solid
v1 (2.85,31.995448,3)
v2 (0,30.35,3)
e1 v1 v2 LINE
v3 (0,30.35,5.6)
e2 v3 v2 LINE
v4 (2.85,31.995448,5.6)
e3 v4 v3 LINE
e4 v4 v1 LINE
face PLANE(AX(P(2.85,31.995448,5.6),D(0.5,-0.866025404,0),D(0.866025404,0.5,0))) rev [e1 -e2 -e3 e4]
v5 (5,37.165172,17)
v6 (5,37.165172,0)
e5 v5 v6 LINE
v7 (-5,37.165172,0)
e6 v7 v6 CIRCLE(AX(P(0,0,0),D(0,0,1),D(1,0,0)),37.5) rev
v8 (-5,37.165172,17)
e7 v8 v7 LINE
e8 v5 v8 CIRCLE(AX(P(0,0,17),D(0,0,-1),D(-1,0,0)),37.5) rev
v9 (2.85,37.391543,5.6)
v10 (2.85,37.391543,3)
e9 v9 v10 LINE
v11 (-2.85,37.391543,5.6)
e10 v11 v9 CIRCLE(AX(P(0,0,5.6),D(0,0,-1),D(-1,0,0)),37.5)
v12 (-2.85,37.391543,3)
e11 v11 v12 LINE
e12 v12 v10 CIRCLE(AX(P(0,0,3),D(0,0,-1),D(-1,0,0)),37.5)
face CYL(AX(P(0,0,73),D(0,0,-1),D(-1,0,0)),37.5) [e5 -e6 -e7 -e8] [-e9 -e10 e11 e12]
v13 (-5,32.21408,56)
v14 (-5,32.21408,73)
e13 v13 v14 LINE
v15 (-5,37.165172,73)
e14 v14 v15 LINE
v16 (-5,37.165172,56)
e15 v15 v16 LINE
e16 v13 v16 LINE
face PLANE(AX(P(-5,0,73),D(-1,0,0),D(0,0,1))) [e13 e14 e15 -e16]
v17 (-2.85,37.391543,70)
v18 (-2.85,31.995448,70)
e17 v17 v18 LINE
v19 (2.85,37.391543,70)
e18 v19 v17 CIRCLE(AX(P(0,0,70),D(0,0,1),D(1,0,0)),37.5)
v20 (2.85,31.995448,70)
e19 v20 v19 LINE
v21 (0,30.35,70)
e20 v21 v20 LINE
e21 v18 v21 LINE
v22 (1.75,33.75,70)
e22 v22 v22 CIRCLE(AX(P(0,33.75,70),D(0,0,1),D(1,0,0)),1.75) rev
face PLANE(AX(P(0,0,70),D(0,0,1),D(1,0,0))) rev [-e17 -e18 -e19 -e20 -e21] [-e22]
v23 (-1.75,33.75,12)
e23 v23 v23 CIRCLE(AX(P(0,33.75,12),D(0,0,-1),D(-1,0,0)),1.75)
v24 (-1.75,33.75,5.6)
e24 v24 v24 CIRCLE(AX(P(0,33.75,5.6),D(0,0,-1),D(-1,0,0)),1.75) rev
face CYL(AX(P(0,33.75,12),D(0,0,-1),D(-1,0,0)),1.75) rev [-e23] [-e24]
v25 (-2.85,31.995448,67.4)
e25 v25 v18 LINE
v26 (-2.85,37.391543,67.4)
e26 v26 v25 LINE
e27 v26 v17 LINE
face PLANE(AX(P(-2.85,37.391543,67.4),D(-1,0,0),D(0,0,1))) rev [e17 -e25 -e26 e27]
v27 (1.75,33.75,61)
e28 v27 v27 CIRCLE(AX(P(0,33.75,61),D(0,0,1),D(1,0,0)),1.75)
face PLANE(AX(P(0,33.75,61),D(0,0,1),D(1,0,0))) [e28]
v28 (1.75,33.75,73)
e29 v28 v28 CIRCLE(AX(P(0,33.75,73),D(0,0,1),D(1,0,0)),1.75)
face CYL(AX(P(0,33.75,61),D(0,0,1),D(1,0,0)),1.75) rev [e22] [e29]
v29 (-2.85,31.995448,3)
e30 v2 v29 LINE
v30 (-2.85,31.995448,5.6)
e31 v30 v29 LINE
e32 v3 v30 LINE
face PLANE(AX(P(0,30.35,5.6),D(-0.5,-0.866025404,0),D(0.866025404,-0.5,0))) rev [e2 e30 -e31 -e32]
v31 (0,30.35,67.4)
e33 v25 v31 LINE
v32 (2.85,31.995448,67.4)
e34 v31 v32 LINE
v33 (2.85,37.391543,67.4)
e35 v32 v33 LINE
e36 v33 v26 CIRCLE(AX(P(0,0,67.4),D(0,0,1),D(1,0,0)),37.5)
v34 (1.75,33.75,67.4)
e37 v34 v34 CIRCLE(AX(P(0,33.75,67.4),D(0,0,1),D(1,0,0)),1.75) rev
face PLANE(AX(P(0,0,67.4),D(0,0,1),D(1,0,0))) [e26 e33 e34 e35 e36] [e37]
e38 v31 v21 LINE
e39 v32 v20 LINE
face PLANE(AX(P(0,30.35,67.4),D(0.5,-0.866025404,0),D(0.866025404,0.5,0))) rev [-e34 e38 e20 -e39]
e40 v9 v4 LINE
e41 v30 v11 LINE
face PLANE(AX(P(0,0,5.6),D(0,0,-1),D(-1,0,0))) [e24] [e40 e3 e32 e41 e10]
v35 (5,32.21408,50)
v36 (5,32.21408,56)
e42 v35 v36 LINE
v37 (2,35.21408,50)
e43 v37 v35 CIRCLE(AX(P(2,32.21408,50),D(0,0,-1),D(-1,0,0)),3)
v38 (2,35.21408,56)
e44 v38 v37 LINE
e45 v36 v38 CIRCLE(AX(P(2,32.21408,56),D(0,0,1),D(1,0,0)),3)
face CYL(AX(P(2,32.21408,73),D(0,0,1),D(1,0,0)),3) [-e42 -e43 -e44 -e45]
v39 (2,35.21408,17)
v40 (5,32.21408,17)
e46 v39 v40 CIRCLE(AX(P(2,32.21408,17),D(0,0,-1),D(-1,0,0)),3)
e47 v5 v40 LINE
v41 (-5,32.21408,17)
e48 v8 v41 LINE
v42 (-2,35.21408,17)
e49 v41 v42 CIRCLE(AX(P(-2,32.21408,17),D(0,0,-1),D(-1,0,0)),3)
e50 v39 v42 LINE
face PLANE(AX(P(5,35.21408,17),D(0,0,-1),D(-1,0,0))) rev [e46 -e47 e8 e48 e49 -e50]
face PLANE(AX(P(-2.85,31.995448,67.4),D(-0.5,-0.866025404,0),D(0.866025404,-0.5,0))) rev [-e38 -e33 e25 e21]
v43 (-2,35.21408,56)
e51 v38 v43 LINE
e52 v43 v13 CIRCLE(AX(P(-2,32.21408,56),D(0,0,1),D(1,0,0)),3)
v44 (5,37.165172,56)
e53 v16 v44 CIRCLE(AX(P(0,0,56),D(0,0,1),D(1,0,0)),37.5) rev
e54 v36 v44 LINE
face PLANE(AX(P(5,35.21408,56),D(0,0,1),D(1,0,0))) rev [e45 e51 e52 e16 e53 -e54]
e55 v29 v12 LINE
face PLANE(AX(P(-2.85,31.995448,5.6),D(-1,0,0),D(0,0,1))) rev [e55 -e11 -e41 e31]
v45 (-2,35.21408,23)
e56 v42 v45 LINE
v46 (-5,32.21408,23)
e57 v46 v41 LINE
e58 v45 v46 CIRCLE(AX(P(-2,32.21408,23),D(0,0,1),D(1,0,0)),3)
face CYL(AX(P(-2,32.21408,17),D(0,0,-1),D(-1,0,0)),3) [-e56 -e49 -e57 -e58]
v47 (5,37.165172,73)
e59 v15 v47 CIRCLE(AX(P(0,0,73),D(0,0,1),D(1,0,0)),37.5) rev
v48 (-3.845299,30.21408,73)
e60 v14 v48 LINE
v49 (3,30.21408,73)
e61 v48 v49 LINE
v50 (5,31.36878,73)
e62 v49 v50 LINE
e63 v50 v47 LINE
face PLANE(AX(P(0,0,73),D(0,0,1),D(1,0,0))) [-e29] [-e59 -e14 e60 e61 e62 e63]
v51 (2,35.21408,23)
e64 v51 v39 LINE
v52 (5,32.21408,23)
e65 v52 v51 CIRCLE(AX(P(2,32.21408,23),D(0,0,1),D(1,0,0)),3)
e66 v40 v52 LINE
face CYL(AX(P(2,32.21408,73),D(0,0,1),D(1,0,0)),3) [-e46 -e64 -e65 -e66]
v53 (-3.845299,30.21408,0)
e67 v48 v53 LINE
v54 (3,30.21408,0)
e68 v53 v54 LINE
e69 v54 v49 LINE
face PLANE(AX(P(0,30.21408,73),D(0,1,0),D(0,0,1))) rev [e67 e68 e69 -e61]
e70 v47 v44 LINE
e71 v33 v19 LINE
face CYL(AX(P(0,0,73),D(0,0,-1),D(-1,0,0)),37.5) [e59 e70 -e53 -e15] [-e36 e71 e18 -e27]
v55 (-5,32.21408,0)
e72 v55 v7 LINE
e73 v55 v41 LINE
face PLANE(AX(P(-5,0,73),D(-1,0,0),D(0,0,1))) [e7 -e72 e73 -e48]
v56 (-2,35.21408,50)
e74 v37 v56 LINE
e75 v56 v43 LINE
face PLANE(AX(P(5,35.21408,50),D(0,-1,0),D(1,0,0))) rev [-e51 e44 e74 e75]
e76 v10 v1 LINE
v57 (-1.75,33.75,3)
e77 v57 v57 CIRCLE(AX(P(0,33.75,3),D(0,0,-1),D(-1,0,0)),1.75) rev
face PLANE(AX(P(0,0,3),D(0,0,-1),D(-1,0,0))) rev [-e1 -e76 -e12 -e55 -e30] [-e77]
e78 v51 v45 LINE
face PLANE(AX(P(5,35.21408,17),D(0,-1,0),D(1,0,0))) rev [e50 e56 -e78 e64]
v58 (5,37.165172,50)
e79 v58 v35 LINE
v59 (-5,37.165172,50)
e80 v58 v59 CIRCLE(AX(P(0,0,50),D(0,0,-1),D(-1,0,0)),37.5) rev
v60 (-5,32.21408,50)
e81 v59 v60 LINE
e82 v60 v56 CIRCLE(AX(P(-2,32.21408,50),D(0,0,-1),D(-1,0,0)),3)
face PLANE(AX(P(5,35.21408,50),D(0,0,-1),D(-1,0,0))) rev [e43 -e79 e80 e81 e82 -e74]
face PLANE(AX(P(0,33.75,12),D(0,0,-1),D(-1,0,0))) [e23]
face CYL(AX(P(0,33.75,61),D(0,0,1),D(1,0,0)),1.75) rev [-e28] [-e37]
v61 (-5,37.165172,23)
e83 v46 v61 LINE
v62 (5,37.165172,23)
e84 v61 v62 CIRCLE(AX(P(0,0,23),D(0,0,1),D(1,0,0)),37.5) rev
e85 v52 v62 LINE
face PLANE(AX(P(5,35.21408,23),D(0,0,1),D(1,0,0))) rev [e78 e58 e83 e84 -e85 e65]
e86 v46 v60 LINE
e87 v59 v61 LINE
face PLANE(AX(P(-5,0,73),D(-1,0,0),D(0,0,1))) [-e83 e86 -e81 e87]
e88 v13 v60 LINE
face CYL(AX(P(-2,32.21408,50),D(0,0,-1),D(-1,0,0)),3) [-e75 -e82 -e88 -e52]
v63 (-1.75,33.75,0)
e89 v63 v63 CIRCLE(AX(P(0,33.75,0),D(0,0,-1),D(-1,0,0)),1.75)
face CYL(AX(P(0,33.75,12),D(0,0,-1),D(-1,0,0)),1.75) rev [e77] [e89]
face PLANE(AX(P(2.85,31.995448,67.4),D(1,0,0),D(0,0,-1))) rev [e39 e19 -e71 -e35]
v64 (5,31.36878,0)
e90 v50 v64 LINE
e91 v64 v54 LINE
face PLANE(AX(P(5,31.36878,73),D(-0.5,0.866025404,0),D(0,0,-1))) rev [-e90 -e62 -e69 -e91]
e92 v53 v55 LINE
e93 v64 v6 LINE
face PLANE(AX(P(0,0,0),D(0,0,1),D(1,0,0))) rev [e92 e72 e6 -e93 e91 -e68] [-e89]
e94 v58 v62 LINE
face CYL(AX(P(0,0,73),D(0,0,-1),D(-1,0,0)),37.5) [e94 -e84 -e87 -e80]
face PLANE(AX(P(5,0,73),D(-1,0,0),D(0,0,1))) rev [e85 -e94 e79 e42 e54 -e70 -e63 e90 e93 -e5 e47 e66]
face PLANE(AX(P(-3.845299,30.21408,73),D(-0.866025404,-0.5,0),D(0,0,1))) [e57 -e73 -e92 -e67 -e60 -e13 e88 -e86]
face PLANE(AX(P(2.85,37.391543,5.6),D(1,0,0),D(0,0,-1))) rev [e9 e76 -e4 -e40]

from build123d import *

# Parameters (mm, degrees)
BOSS_EXTRU_2_DEPTH      = 73
ESQUISSE6_W             = 6
ESQUISSE6_H             = 5
ENL_V_MAT_EXTRU_3_DEPTH = 83.675570757
ESQUISSE7_R             = 1.75
ENL_V_MAT_EXTRU_4_DEPTH = 12
ENL_V_START             = -12
ESQUISSE8_R             = 1.75
ENL_V_MAT_EXTRU_5_DEPTH = 12
CONG_1_R                = 3
ENL_V_START_2           = -3
ENL_V_MAT_EXTRU_6_DEPTH = 2.6
ENL_V_START_3           = -5.6
ENL_V_MAT_EXTRU_7_DEPTH = 2.6
CHANFREIN1_SIZE         = 1.154700538
CHANFREIN1_SIZE_2       = 2


with BuildPart() as part:
    # Esquisse3 → Boss.-Extru.2 (new body)
    with BuildSketch(Plane.XY):
        with BuildLine():
            ThreePointArc((-5, 37.165171868), (0, 37.5), (5, 37.165171868))
            Line((5, 37.165171868), (5, 30.214079913))
            Line((5, 30.214079913), (-5, 30.214079913))
            Line((-5, 30.214079913), (-5, 37.165171868))
        make_face()
    extrude(amount=BOSS_EXTRU_2_DEPTH)

    # Esquisse6 → Enlèv. mat.-Extru.3 (cut, through all)
    with BuildSketch(Plane.ZY.offset(5)):
        with Locations((20, 37.714079913)):
            Rectangle(ESQUISSE6_W, ESQUISSE6_H)
        with Locations((53, 37.714079913)):
            Rectangle(ESQUISSE6_W, ESQUISSE6_H)
    extrude(amount=-ENL_V_MAT_EXTRU_3_DEPTH, mode=Mode.SUBTRACT)

    # Esquisse7 → Enlèv. mat.-Extru.4 (cut)
    with BuildSketch(Plane.XY.offset(73)):
        with Locations((0, 33.75)):
            Circle(ESQUISSE7_R)
    extrude(amount=-ENL_V_MAT_EXTRU_4_DEPTH, mode=Mode.SUBTRACT)

    # Esquisse8 → Enlèv. mat.-Extru.5 (cut)
    with BuildSketch(Plane(origin=(0, 0, 0), x_dir=(-1, 0, 0), z_dir=(0, 0, -1)).offset(ENL_V_START)):
        with Locations(Location((0, 33.75, 0), (0, 0, 180))):
            Circle(ESQUISSE8_R)
    extrude(amount=ENL_V_MAT_EXTRU_5_DEPTH, mode=Mode.SUBTRACT)

    # Congé1
    cong_1_edges = [part.edges().sort_by_distance(p)[0] for p in [
        (5, 35.214079913, 20),
        (-5, 35.214079913, 20),
        (5, 35.214079913, 53),
        (-5, 35.214079913, 53),
    ]]
    fillet(cong_1_edges, radius=CONG_1_R)

    # Esquisse9 → Enlèv. mat.-Extru.6 (cut)
    with BuildSketch(Plane(origin=(0, 0, 0), x_dir=(-1, 0, 0), z_dir=(0, 0, -1)).offset(ENL_V_START_2)):
        with BuildLine():
            Line((-2.85, 37.391543162), (-2.85, 31.995448267))
            Line((-2.85, 31.995448267), (0, 30.35))
            Line((0, 30.35), (2.85, 31.995448267))
            Line((2.85, 31.995448267), (2.85, 37.391543162))
            ThreePointArc((2.85, 37.391543162), (0, 37.5), (-2.85, 37.391543162))
        make_face()
    extrude(amount=-ENL_V_MAT_EXTRU_6_DEPTH, mode=Mode.SUBTRACT)

    # Esquisse10 → Enlèv. mat.-Extru.7 (cut)
    with BuildSketch(Plane.XY.offset(73).offset(ENL_V_START_3)):
        with BuildLine():
            Line((-2.85, 37.391543162), (-2.85, 31.995448267))
            Line((-2.85, 31.995448267), (0, 30.35))
            Line((0, 30.35), (2.85, 31.995448267))
            Line((2.85, 31.995448267), (2.85, 37.391543162))
            ThreePointArc((2.85, 37.391543162), (0, 37.5), (-2.85, 37.391543162))
        make_face()
    extrude(amount=ENL_V_MAT_EXTRU_7_DEPTH, mode=Mode.SUBTRACT)

    # Chanfrein1
    # the kernel refuses this chamfer: 2, 1.154700538 mm, written as the material it takes off along each edge
    with BuildSketch(Plane(origin=(5, 30.214079913, -5.174171509), x_dir=(0.0578938624026711, 0.9983227437537925, 0), z_dir=(0, 0, 1)), Plane(origin=(-5, 30.214079913, -5.174171509), x_dir=(0.9983227437537925, -0.05789386240267115, 0), z_dir=(0, 0, 1))) as chanfrein1_piece_1:
        Polygon((CHANFREIN1_SIZE * 0.998322744082, CHANFREIN1_SIZE * 0.0578938624217), (-CHANFREIN1_SIZE_2 * 0.0578938624027, CHANFREIN1_SIZE_2 * 0.998322743754), (0, 0), align=None)
    extrude(amount=83.348343019, mode=Mode.SUBTRACT)


solid = part.part
